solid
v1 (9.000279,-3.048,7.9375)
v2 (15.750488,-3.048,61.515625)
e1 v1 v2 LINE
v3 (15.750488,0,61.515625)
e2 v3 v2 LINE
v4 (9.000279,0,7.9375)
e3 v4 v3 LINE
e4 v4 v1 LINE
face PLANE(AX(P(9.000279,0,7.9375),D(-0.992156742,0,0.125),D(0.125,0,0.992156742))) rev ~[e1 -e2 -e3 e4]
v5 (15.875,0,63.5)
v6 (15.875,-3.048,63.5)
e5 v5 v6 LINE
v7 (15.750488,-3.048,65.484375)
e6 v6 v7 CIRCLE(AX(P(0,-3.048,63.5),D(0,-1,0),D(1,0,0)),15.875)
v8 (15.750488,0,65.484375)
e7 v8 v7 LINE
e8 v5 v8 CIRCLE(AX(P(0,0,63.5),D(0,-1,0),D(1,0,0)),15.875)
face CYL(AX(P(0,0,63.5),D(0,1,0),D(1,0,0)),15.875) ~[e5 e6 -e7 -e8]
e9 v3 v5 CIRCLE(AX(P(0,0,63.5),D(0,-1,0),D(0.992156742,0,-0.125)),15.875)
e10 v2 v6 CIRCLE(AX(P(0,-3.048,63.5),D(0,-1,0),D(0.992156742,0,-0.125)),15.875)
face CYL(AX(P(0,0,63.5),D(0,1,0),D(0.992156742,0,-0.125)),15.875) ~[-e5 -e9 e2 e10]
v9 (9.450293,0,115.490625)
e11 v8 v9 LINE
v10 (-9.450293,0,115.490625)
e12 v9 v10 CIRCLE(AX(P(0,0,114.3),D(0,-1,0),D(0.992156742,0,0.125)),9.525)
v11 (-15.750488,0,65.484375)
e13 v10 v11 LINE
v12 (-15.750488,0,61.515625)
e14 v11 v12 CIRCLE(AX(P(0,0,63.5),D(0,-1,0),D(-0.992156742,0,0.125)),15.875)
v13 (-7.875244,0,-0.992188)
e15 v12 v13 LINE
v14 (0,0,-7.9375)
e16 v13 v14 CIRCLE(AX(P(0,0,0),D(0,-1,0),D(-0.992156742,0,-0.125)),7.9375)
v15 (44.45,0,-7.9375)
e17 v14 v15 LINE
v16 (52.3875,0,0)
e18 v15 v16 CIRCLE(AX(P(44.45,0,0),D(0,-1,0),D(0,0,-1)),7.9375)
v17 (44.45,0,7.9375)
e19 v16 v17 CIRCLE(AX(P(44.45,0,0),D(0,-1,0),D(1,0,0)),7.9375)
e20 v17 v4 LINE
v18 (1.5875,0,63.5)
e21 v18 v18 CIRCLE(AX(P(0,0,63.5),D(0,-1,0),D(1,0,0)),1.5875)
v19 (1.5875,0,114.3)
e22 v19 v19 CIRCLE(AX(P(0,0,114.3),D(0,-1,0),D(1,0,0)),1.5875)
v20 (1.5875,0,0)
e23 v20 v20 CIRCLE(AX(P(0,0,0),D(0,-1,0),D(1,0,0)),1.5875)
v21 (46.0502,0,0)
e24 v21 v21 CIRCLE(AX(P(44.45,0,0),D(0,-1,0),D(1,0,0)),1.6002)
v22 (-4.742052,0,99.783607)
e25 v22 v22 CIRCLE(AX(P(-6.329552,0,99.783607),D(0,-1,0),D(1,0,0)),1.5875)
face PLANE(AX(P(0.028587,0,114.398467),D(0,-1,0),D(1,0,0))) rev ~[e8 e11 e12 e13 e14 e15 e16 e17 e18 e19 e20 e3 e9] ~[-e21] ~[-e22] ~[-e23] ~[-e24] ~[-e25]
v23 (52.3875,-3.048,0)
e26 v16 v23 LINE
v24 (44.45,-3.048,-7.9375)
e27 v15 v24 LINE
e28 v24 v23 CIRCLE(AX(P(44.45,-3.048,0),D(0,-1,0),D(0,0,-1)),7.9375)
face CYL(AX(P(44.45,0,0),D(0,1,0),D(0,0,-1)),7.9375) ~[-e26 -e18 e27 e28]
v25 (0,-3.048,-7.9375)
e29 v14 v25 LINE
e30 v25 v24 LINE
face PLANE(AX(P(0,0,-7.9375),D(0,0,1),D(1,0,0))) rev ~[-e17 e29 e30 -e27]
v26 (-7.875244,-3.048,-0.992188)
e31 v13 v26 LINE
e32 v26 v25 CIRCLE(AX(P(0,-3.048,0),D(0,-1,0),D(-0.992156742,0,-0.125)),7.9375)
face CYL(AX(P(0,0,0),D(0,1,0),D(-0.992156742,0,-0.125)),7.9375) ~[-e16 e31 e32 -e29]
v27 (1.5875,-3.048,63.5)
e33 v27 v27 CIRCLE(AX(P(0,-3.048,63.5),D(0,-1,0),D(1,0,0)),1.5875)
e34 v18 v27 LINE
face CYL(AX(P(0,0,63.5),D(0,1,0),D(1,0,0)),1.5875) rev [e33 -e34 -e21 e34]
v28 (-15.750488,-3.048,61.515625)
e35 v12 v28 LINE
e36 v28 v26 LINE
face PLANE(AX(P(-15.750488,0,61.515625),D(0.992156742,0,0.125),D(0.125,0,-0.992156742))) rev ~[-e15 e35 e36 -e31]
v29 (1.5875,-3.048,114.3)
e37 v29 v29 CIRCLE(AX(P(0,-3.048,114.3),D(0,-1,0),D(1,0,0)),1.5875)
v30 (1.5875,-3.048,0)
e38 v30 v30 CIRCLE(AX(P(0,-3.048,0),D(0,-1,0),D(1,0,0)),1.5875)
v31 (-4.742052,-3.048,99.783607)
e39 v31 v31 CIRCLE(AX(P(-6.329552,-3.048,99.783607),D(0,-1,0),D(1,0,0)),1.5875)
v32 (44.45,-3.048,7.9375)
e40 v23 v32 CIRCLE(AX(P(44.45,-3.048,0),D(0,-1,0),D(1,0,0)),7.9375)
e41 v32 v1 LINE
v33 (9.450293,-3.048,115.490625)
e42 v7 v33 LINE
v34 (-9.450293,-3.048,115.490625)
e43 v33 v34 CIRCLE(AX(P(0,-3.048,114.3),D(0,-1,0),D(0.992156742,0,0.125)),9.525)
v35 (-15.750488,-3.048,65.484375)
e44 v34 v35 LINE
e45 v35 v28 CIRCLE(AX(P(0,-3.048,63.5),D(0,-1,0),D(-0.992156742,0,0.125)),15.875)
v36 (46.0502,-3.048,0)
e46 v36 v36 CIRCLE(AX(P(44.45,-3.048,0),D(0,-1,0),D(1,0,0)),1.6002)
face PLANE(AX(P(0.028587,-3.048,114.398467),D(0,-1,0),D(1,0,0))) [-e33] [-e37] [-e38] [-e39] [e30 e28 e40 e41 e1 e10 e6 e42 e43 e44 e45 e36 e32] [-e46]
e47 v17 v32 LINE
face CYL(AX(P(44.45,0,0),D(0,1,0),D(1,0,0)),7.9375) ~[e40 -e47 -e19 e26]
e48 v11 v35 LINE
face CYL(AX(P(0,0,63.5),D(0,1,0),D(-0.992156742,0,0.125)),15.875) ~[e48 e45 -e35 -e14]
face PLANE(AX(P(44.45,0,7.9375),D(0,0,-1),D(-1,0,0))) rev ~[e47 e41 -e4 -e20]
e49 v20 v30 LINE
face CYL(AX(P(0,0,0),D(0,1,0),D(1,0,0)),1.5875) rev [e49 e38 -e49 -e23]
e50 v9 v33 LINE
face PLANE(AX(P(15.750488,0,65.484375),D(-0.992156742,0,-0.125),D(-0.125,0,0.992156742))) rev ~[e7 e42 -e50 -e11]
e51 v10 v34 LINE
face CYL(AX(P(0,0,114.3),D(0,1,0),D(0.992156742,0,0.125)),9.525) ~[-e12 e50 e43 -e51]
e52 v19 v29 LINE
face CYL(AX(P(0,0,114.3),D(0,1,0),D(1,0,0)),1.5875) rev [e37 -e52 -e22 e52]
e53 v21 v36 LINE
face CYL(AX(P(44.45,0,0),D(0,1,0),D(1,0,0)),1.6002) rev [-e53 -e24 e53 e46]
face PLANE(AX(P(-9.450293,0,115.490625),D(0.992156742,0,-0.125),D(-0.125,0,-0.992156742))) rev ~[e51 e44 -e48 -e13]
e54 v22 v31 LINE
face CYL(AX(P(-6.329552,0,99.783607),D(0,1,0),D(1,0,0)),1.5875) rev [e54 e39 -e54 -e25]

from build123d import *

# Parameters (mm, degrees)
F0_R     = 1.5875
F0_R_2   = 1.6002
F1_DEPTH = 3.048
F4_DEPTH = 3.048


# Not quite as in the source:
# - a feature of the source that left no trace in its solid (it failed there, or was rolled back) is left out


with BuildPart() as f1:
    # F0 (on Front) → F1 (new body)
    with BuildSketch(Plane.XZ):
        with BuildLine():
            ThreePointArc((-9.4502929642, 115.490625), (-0.596483242, 104.7936951058), (9.525, 114.3))
            ThreePointArc((9.525, 114.3), (9.5063048942, 114.896483242), (9.4502929642, 115.490625))
            ThreePointArc((9.4502929642, 115.490625), (0, 123.825), (-9.4502929642, 115.490625))
        make_face()
        with Locations((0, 114.3)):
            Circle(F0_R, mode=Mode.SUBTRACT)
        with BuildLine():
            ThreePointArc((9.4502929642, 115.490625), (9.5063048942, 114.896483242), (9.525, 114.3))
            ThreePointArc((9.525, 114.3), (-0.596483242, 104.7936951058), (-9.4502929642, 115.490625))
            Line((-9.4502929642, 115.490625), (-15.7504882737, 65.484375))
            ThreePointArc((-15.7504882737, 65.484375), (0, 79.375), (15.7504882737, 65.484375))
            Line((15.7504882737, 65.484375), (9.4502929642, 115.490625))
        make_face()
        with Locations((-6.3295518048, 99.7836068273)):
            Circle(F0_R, mode=Mode.SUBTRACT)
        with BuildLine():
            ThreePointArc((15.875, 63.5), (15.8438414904, 64.4941387366), (15.7504882737, 65.484375))
            ThreePointArc((15.7504882737, 65.484375), (0, 79.375), (-15.7504882737, 65.484375))
            ThreePointArc((-15.7504882737, 65.484375), (-15.875, 63.5), (-15.7504882737, 61.515625))
            ThreePointArc((-15.7504882737, 61.515625), (0, 47.625), (15.7504882737, 61.515625))
            ThreePointArc((15.7504882737, 61.515625), (15.8438414904, 62.5058612634), (15.875, 63.5))
        make_face()
        with Locations((0, 63.5)):
            Circle(F0_R, mode=Mode.SUBTRACT)
        with BuildLine():
            ThreePointArc((15.7504882737, 61.515625), (0, 47.625), (-15.7504882737, 61.515625))
            Line((-15.7504882737, 61.515625), (-7.8752441368, -0.9921875))
            ThreePointArc((-7.8752441368, -0.9921875), (-5.953125, 5.2501627579), (0, 7.9375))
            Line((0, 7.9375), (9.0002790135, 7.9375))
            Line((9.0002790135, 7.9375), (15.7504882737, 61.515625))
        make_face()
        with BuildLine():
            ThreePointArc((0, 7.9375), (-5.953125, 5.2501627579), (-7.8752441368, -0.9921875))
            ThreePointArc((-7.8752441368, -0.9921875), (-5.2501627579, -5.953125), (0, -7.9375))
            ThreePointArc((0, -7.9375), (5.2501627579, -5.953125), (7.8752441368, -0.9921875))
            ThreePointArc((7.8752441368, -0.9921875), (7.9219207452, -0.4970693683), (7.9375, 0))
            ThreePointArc((7.9375, 0), (5.6126600757, 5.6126600757), (0, 7.9375))
        make_face()
        Circle(F0_R, mode=Mode.SUBTRACT)
        with BuildLine():
            Line((7.8752441368, -0.9921875), (9.0002790135, 7.9375))
            Line((9.0002790135, 7.9375), (0, 7.9375))
            ThreePointArc((0, 7.9375), (5.6126600757, 5.6126600757), (7.9375, 0))
            ThreePointArc((7.9375, 0), (7.9219207452, -0.4970693683), (7.8752441368, -0.9921875))
        make_face()
        with BuildLine():
            Line((44.45, 7.9375), (9.0002790135, 7.9375))
            Line((9.0002790135, 7.9375), (7.8752441368, -0.9921875))
            ThreePointArc((7.8752441368, -0.9921875), (5.2501627579, -5.953125), (0, -7.9375))
            Line((0, -7.9375), (44.45, -7.9375))
            ThreePointArc((44.45, -7.9375), (36.5125, 0), (44.45, 7.9375))
        make_face()
        with BuildLine():
            ThreePointArc((52.3875, 0), (50.0626600757, 5.6126600757), (44.45, 7.9375))
            ThreePointArc((44.45, 7.9375), (36.5125, 0), (44.45, -7.9375))
            ThreePointArc((44.45, -7.9375), (50.0626600757, -5.6126600757), (52.3875, 0))
        make_face()
        with Locations((44.45, 0)):
            Circle(F0_R_2, mode=Mode.SUBTRACT)
    extrude(amount=F1_DEPTH)


with BuildPart() as f4:
    # F0 (on Front) → F4 (new body)
    with BuildSketch(Plane.XZ):
        with BuildLine():
            ThreePointArc((-9.4502929642, 115.490625), (-0.596483242, 104.7936951058), (9.525, 114.3))
            ThreePointArc((9.525, 114.3), (9.5063048942, 114.896483242), (9.4502929642, 115.490625))
            ThreePointArc((9.4502929642, 115.490625), (0, 123.825), (-9.4502929642, 115.490625))
        make_face()
        with Locations((0, 114.3)):
            Circle(F0_R, mode=Mode.SUBTRACT)
        with BuildLine():
            ThreePointArc((9.4502929642, 115.490625), (9.5063048942, 114.896483242), (9.525, 114.3))
            ThreePointArc((9.525, 114.3), (-0.596483242, 104.7936951058), (-9.4502929642, 115.490625))
            Line((-9.4502929642, 115.490625), (-15.7504882737, 65.484375))
            ThreePointArc((-15.7504882737, 65.484375), (0, 79.375), (15.7504882737, 65.484375))
            Line((15.7504882737, 65.484375), (9.4502929642, 115.490625))
        make_face()
        with Locations((-6.3295518048, 99.7836068273)):
            Circle(F0_R, mode=Mode.SUBTRACT)
        with BuildLine():
            ThreePointArc((15.875, 63.5), (15.8438414904, 64.4941387366), (15.7504882737, 65.484375))
            ThreePointArc((15.7504882737, 65.484375), (0, 79.375), (-15.7504882737, 65.484375))
            ThreePointArc((-15.7504882737, 65.484375), (-15.875, 63.5), (-15.7504882737, 61.515625))
            ThreePointArc((-15.7504882737, 61.515625), (0, 47.625), (15.7504882737, 61.515625))
            ThreePointArc((15.7504882737, 61.515625), (15.8438414904, 62.5058612634), (15.875, 63.5))
        make_face()
        with Locations((0, 63.5)):
            Circle(F0_R, mode=Mode.SUBTRACT)
        with BuildLine():
            ThreePointArc((15.7504882737, 61.515625), (0, 47.625), (-15.7504882737, 61.515625))
            Line((-15.7504882737, 61.515625), (-7.8752441368, -0.9921875))
            ThreePointArc((-7.8752441368, -0.9921875), (-5.953125, 5.2501627579), (0, 7.9375))
            Line((0, 7.9375), (9.0002790135, 7.9375))
            Line((9.0002790135, 7.9375), (15.7504882737, 61.515625))
        make_face()
        with BuildLine():
            ThreePointArc((0, 7.9375), (-5.953125, 5.2501627579), (-7.8752441368, -0.9921875))
            ThreePointArc((-7.8752441368, -0.9921875), (-5.2501627579, -5.953125), (0, -7.9375))
            ThreePointArc((0, -7.9375), (5.2501627579, -5.953125), (7.8752441368, -0.9921875))
            ThreePointArc((7.8752441368, -0.9921875), (7.9219207452, -0.4970693683), (7.9375, 0))
            ThreePointArc((7.9375, 0), (5.6126600757, 5.6126600757), (0, 7.9375))
        make_face()
        Circle(F0_R, mode=Mode.SUBTRACT)
        with BuildLine():
            Line((7.8752441368, -0.9921875), (9.0002790135, 7.9375))
            Line((9.0002790135, 7.9375), (0, 7.9375))
            ThreePointArc((0, 7.9375), (5.6126600757, 5.6126600757), (7.9375, 0))
            ThreePointArc((7.9375, 0), (7.9219207452, -0.4970693683), (7.8752441368, -0.9921875))
        make_face()
        with BuildLine():
            Line((44.45, 7.9375), (9.0002790135, 7.9375))
            Line((9.0002790135, 7.9375), (7.8752441368, -0.9921875))
            ThreePointArc((7.8752441368, -0.9921875), (5.2501627579, -5.953125), (0, -7.9375))
            Line((0, -7.9375), (44.45, -7.9375))
            ThreePointArc((44.45, -7.9375), (36.5125, 0), (44.45, 7.9375))
        make_face()
        with BuildLine():
            ThreePointArc((52.3875, 0), (50.0626600757, 5.6126600757), (44.45, 7.9375))
            ThreePointArc((44.45, 7.9375), (36.5125, 0), (44.45, -7.9375))
            ThreePointArc((44.45, -7.9375), (50.0626600757, -5.6126600757), (52.3875, 0))
        make_face()
        with Locations((44.45, 0)):
            Circle(F0_R_2, mode=Mode.SUBTRACT)
    extrude(amount=F4_DEPTH)


solid = f4.part
